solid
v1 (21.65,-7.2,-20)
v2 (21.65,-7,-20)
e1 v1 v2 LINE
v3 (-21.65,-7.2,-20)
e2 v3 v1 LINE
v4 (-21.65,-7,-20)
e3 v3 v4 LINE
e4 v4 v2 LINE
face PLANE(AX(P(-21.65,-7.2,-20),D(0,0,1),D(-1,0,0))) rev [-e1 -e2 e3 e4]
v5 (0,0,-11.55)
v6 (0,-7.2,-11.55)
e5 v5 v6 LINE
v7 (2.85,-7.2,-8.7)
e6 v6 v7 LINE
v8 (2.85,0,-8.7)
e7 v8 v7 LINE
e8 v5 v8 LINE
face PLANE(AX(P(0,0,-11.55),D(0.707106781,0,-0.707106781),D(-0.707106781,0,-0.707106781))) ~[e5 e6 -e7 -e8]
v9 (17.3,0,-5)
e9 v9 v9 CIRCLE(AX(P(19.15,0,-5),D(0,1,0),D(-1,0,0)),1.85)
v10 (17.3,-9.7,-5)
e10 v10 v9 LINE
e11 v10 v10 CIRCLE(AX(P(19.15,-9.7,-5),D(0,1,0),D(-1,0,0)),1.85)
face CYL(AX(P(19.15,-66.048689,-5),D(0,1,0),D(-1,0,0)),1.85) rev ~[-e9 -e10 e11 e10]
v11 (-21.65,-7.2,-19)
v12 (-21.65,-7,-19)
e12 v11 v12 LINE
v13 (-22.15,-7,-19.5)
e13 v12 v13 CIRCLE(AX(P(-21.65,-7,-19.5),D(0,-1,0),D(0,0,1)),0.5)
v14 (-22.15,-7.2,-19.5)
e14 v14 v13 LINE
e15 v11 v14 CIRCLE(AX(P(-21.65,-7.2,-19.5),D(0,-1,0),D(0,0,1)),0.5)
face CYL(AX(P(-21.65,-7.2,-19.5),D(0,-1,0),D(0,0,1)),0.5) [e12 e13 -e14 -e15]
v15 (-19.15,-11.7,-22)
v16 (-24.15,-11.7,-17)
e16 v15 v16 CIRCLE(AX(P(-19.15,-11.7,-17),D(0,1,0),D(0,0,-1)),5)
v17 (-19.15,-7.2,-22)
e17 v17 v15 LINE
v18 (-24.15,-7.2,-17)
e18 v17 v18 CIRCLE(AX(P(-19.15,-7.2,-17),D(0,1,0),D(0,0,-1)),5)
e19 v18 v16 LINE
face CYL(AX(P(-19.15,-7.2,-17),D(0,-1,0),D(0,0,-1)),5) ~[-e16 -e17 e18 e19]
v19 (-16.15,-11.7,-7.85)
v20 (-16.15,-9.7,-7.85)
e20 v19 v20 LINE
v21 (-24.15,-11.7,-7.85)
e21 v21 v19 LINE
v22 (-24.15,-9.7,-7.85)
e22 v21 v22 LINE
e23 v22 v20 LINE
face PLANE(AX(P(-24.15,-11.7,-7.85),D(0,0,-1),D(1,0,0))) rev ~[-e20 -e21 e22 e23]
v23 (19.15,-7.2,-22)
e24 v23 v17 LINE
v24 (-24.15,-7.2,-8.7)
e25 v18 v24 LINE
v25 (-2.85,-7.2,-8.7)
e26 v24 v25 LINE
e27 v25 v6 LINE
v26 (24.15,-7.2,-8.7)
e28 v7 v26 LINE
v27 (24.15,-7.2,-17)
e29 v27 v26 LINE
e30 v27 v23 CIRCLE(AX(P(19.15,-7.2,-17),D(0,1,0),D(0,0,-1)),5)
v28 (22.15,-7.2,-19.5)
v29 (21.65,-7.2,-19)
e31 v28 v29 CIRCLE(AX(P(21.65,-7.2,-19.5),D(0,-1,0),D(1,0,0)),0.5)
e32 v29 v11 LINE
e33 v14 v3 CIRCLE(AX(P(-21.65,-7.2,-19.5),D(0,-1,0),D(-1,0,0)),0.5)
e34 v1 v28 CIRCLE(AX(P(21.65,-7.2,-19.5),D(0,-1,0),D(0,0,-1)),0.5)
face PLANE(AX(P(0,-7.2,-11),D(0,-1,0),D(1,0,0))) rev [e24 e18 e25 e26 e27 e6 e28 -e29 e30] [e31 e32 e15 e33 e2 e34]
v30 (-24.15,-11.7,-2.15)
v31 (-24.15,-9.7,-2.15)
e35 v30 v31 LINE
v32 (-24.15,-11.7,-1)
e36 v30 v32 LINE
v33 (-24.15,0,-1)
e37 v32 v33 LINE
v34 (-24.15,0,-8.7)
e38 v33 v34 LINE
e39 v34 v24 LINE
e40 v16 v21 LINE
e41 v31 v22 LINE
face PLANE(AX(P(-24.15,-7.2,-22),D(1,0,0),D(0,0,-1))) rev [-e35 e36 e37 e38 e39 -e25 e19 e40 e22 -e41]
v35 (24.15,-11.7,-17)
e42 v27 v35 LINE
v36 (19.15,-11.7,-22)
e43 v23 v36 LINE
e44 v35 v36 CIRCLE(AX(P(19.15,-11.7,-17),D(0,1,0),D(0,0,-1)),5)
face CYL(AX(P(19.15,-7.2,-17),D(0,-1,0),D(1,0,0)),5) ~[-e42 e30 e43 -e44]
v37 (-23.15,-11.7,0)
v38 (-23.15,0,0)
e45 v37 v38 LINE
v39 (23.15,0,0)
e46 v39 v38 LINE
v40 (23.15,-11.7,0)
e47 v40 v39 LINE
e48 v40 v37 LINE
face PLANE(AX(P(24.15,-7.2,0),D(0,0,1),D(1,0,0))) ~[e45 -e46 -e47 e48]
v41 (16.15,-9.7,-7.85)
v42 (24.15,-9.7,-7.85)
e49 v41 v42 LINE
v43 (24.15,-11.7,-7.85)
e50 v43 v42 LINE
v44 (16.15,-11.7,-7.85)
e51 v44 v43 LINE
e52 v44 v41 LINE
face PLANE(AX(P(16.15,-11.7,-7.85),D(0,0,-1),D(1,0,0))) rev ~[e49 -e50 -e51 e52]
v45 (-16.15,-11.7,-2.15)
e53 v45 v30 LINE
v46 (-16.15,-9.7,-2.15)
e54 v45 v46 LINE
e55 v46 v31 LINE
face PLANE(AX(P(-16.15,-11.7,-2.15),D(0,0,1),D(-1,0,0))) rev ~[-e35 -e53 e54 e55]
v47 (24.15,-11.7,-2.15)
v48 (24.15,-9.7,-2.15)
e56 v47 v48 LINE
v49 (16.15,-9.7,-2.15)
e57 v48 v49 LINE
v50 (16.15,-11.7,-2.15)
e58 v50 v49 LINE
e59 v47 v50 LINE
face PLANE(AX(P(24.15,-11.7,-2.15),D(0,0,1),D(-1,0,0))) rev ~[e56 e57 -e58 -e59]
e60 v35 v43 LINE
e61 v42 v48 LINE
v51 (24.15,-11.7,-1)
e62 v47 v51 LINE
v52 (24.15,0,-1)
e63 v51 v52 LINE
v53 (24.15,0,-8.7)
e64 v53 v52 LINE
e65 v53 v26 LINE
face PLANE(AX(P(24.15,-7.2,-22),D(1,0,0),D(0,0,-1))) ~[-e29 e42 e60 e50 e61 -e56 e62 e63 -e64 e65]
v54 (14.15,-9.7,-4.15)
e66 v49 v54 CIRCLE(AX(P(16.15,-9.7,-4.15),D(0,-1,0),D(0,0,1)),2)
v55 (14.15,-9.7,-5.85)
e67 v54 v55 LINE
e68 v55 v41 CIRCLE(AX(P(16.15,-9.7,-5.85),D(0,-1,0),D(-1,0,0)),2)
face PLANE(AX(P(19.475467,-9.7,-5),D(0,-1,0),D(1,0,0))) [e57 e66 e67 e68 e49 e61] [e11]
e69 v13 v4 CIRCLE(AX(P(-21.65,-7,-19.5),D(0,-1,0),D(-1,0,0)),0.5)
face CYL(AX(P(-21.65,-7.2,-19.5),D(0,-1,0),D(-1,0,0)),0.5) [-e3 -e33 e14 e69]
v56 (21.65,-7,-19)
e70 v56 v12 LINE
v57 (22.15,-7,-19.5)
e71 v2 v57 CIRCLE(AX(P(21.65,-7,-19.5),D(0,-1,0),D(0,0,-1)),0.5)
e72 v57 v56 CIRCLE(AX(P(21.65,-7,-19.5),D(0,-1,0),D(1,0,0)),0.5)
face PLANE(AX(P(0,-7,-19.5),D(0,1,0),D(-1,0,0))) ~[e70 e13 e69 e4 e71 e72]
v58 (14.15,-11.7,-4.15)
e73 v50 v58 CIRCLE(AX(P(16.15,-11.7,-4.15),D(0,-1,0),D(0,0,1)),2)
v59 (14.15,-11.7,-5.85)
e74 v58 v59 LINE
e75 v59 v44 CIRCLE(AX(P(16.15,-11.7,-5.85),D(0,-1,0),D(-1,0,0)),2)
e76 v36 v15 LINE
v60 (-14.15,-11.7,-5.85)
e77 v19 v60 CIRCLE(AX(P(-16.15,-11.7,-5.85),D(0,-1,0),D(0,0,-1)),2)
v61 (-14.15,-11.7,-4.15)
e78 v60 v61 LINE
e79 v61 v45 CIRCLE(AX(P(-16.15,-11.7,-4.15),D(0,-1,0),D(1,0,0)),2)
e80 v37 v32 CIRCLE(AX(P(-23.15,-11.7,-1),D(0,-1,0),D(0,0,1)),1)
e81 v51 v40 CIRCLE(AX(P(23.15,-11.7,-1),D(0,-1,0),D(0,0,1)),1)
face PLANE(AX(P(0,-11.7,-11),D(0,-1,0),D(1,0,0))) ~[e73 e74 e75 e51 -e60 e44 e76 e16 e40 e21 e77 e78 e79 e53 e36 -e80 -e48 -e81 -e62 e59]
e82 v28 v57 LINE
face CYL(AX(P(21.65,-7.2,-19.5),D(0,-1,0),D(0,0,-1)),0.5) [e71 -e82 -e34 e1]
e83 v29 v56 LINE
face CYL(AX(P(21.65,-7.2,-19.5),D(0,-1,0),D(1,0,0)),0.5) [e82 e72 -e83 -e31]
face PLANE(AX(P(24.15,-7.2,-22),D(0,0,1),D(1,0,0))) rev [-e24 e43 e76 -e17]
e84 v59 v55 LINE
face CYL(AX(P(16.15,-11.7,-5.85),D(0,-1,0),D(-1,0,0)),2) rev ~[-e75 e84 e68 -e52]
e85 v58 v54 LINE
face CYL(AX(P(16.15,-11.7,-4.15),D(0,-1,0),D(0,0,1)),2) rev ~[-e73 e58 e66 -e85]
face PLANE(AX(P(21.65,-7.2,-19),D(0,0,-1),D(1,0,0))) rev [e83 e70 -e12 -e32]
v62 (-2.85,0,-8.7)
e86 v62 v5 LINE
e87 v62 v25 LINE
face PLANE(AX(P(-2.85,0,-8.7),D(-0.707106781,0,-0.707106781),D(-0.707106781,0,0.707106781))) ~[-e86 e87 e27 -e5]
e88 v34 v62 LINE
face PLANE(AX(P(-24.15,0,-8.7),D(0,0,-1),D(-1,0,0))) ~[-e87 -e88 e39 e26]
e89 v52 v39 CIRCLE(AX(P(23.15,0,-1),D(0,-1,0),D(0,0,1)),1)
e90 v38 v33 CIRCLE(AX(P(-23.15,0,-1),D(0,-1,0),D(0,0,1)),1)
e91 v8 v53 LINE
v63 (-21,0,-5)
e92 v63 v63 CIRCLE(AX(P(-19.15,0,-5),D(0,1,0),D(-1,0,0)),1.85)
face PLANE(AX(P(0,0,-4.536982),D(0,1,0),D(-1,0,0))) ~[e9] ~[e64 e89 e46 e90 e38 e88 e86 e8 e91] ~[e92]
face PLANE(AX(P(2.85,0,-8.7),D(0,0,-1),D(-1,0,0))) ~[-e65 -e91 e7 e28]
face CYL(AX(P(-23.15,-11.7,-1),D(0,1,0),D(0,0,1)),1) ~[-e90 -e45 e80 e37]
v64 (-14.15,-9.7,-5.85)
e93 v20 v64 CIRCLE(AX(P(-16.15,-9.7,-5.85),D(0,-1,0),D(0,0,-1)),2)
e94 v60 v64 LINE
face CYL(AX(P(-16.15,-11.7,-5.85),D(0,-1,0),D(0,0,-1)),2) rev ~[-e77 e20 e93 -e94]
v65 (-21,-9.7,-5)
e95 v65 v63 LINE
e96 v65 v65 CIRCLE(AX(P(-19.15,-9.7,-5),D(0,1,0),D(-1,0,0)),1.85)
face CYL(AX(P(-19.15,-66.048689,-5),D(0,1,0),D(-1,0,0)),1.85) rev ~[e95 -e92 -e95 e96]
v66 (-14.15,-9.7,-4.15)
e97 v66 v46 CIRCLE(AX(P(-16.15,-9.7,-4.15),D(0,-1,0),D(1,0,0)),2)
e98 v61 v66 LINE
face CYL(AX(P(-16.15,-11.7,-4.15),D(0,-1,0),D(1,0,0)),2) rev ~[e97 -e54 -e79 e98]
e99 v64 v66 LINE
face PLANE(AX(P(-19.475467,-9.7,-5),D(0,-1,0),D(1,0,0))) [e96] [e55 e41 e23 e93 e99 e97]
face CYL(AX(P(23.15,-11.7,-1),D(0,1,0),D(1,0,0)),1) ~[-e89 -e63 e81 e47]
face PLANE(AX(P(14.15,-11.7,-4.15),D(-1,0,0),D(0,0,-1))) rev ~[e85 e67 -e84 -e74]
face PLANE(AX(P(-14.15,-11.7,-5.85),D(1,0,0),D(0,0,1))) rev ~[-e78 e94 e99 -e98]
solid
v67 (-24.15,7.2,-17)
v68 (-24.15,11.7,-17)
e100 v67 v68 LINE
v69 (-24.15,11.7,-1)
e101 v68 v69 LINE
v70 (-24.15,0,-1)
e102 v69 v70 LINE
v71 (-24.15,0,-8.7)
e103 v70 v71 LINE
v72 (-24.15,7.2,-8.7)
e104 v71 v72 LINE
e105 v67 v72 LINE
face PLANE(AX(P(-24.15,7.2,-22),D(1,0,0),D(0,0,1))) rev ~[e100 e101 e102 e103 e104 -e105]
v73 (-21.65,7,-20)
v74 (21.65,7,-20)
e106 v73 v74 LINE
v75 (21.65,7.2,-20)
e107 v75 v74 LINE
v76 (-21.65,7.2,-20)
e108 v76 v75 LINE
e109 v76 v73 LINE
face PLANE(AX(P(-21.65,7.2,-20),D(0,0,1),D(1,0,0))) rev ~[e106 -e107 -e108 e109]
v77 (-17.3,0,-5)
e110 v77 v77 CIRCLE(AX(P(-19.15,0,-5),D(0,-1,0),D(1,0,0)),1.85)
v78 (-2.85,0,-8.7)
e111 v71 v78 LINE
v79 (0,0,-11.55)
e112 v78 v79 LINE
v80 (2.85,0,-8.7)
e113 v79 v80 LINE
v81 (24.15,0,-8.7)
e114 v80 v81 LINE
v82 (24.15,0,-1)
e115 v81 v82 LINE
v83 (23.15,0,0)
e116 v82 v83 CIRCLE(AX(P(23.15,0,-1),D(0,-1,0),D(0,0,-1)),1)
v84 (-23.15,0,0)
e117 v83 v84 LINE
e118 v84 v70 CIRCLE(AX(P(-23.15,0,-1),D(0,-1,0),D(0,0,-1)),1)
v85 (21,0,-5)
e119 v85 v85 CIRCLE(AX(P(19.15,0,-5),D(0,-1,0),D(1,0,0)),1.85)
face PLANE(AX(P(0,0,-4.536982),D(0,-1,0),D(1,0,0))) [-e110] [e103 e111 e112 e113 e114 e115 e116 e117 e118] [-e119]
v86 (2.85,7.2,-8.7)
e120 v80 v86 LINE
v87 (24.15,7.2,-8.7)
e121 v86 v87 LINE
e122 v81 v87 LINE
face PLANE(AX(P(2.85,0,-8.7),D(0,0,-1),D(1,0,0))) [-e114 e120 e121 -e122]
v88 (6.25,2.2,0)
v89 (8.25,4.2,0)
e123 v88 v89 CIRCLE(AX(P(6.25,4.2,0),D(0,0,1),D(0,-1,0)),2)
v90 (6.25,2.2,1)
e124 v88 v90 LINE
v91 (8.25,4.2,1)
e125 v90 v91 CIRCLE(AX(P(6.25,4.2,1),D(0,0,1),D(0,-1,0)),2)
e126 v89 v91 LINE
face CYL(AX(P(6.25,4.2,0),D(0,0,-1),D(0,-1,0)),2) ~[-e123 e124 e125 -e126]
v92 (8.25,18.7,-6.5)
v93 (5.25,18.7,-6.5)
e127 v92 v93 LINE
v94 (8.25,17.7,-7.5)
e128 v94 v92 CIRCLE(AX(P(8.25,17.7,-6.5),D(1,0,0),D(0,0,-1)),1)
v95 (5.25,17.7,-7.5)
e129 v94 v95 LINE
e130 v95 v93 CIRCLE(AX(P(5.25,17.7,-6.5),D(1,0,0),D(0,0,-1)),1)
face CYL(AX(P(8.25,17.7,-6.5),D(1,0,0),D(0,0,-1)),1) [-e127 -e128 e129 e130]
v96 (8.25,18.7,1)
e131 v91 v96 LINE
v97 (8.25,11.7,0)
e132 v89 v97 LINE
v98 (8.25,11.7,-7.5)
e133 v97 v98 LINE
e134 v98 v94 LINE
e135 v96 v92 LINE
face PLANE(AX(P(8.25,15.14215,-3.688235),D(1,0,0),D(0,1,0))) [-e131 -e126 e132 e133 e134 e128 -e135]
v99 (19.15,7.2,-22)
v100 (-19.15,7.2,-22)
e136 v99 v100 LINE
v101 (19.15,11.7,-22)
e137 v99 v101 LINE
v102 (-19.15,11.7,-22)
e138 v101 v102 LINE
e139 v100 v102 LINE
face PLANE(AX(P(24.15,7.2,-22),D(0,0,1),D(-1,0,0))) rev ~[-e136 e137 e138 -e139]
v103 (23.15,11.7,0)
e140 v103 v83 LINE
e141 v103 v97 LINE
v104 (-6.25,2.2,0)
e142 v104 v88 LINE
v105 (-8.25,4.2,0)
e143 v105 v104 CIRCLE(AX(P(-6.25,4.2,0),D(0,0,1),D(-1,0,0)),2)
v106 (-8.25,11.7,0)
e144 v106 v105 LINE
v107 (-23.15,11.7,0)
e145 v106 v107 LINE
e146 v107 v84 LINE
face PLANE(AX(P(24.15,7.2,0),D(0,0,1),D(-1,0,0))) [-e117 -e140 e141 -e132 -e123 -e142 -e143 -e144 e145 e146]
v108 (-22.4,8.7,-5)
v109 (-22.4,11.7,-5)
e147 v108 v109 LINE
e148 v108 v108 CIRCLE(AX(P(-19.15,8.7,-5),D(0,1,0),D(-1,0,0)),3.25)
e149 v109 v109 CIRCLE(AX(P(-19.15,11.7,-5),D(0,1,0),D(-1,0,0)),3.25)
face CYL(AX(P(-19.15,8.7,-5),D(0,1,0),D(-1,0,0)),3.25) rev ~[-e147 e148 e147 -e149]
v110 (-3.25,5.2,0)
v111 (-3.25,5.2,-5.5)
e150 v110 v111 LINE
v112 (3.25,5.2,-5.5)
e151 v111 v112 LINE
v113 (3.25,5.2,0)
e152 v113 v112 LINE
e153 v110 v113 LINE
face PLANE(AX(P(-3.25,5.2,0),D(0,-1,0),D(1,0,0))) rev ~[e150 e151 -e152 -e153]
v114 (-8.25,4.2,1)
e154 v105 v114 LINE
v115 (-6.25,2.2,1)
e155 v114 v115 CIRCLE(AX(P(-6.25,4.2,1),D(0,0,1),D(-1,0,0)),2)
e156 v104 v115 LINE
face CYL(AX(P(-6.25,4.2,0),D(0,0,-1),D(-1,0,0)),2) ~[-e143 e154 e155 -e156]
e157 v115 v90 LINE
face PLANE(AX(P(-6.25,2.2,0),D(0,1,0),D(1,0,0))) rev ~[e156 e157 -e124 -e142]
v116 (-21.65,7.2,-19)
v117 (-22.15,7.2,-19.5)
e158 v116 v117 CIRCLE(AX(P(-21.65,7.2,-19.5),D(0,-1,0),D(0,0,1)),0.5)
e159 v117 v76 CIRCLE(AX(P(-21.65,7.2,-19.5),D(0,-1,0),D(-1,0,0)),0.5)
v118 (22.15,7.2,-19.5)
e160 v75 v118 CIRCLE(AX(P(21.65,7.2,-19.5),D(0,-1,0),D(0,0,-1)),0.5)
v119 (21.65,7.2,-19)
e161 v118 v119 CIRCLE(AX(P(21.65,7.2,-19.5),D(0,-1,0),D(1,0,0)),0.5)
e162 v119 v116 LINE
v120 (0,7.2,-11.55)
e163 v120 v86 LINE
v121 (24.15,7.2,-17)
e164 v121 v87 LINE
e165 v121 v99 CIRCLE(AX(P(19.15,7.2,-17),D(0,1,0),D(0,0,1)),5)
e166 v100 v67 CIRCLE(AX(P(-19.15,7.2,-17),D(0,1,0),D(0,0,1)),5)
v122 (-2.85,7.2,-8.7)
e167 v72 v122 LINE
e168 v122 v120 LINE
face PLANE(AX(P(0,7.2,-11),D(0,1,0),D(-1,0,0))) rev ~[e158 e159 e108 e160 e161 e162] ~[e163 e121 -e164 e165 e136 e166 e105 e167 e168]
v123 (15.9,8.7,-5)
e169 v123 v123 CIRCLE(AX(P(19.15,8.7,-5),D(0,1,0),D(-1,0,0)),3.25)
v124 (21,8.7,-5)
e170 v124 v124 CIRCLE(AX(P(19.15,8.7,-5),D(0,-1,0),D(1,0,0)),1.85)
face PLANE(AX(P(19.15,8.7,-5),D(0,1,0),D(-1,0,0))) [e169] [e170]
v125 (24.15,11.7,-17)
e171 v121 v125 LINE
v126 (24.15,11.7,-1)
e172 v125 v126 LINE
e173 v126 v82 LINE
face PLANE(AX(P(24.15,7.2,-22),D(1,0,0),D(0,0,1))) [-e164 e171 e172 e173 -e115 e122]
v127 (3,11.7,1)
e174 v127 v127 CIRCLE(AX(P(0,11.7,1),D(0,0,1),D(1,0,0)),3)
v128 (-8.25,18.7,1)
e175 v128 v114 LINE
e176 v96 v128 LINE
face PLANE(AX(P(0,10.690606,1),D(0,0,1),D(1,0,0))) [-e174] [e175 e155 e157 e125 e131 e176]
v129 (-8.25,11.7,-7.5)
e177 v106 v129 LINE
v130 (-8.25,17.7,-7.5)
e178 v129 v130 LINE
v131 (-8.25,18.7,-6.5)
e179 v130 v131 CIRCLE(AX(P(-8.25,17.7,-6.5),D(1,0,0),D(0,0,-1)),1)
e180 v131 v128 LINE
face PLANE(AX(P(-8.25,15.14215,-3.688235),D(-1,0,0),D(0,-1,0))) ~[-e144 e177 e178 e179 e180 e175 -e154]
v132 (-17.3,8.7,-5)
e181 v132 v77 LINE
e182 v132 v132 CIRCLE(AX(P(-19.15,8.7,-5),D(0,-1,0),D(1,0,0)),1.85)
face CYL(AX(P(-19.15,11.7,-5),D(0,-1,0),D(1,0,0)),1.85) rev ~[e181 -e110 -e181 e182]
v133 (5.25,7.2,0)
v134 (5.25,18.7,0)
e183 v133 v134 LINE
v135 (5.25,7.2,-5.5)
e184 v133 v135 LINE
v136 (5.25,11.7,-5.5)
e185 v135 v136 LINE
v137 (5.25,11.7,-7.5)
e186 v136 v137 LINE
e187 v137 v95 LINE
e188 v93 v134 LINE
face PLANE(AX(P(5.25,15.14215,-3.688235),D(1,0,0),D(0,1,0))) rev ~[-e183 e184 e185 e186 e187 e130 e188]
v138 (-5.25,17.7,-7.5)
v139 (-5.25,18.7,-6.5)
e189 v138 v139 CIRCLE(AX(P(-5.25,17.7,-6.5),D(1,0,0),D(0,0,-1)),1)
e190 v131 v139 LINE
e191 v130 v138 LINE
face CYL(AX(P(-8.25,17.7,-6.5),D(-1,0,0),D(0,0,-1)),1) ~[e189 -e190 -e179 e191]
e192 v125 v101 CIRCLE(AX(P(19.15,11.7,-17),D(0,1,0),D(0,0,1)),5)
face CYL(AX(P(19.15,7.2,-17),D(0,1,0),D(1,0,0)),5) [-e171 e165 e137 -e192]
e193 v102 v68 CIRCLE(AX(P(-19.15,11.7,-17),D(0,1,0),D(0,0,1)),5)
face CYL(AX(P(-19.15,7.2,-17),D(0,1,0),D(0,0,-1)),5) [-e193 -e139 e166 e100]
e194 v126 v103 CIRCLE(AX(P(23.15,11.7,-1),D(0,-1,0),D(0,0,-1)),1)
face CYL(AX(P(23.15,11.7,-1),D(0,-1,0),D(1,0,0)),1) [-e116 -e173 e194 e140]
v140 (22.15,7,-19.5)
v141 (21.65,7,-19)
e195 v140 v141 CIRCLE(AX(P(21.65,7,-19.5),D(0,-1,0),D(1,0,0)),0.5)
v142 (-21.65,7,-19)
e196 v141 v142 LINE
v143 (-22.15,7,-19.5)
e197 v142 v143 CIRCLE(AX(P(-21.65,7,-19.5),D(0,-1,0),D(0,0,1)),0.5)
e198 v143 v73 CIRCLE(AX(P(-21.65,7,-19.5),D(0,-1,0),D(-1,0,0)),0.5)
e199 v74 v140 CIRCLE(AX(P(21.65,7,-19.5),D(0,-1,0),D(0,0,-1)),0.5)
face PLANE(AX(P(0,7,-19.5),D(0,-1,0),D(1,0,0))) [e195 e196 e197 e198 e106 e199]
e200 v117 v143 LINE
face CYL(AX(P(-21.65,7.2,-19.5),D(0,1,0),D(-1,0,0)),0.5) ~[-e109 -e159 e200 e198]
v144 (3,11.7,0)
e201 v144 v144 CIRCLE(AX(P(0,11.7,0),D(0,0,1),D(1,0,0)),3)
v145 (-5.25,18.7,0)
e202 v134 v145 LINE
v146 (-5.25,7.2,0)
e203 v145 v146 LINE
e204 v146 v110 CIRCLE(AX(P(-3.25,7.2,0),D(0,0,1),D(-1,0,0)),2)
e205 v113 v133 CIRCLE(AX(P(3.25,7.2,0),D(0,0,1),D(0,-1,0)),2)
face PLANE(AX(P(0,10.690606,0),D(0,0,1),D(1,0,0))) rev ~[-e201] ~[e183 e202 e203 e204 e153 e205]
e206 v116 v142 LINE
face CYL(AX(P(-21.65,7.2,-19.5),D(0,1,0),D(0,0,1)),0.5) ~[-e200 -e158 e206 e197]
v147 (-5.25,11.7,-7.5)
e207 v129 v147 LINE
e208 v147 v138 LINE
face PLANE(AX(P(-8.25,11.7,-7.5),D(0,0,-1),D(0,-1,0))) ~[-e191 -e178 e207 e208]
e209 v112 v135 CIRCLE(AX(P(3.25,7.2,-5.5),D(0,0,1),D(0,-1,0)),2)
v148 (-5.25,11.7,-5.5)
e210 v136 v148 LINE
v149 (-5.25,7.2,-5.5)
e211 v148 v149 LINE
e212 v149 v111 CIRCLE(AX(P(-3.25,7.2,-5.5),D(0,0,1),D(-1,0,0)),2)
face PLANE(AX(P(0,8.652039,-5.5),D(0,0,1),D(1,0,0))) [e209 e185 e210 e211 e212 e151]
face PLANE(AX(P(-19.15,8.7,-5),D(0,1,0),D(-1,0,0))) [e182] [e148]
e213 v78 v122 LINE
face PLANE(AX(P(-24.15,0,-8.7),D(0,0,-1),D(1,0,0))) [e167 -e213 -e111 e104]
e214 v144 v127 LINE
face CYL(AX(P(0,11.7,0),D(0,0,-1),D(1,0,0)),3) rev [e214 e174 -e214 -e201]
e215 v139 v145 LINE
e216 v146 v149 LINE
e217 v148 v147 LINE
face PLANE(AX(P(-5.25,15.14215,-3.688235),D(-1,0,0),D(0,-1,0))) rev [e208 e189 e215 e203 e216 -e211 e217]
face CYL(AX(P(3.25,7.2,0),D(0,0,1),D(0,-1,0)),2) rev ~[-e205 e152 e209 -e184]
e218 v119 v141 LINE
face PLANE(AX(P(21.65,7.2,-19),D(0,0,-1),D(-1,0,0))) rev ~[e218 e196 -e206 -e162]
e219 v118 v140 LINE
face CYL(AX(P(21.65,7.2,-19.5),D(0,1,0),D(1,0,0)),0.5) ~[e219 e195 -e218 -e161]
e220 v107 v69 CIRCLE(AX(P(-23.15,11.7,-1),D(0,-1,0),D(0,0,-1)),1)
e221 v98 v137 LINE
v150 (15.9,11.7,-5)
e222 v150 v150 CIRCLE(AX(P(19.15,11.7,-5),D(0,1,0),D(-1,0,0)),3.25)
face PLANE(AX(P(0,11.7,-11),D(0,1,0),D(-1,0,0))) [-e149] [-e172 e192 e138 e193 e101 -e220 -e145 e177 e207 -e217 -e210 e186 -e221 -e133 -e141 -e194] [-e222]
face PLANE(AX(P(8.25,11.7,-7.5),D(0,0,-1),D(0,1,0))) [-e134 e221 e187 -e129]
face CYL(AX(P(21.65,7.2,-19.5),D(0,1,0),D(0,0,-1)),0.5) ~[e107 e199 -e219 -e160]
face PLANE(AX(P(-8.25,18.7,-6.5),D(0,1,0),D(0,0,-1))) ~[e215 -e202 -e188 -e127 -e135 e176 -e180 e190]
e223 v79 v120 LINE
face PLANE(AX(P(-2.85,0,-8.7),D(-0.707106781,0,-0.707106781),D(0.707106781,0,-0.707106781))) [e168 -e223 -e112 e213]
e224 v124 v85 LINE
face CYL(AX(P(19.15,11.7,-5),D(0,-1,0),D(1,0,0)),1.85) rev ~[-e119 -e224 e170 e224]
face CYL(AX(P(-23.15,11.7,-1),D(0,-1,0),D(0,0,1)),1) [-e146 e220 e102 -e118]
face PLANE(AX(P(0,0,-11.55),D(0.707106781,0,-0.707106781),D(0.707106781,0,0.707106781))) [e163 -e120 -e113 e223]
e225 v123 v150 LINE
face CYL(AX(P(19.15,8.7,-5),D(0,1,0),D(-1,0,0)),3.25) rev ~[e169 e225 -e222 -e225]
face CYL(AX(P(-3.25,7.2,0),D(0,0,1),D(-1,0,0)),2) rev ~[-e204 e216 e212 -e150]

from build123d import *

# Parameters (mm, degrees)
F2_DEPTH        = 7.2
F3_W            = 48.3
F3_H            = 22
F4_DEPTH        = 4.5
F7_DEPTH        = 0.2
F10_D           = 3.7
F10_CBORE_D     = 6.5
F10_CBORE_DEPTH = 3
F11_D           = 3.7
F13_DEPTH       = 2
F14_R           = 1
F14_2_R         = 1
F15_R           = 5
F15_2_R         = 5
F17_DEPTH       = 5.5
F18_R           = 3
F19_DEPTH       = 1
F21_DEPTH       = 3


# Not quite as in the source:
# - a pattern or mirror of a feature is missing from the dataset's text; its kind, count and spacing are read off the source's solid


with BuildPart() as f2:
    # F1 (on Front) → F2 (new body)
    with BuildSketch(Plane.XZ):
        Polygon((-24.15, 0), (-24.15, -8.7), (-2.85, -8.7), (0, -11.55), (2.85, -8.7), (24.15, -8.7), (24.15, 0), align=None)
    extrude(amount=-F2_DEPTH)

    # F3 (on face) → F4 (join)
    with BuildSketch(Plane(origin=(0, 7.2, 0), x_dir=(-1, 0, 0), z_dir=(0, 1, 0))):
        with Locations((0, -11)):
            Rectangle(F3_W, F3_H)
    extrude(amount=F4_DEPTH)

    # F6 (on face) → F7 (join)
    with BuildSketch(Plane.XZ.offset(-7.2)):
        with BuildLine():
            ThreePointArc((22.15, -19.5), (22.0035533906, -19.1464466094), (21.65, -19))
            Line((21.65, -19), (-21.65, -19))
            ThreePointArc((-21.65, -19), (-22.0035533906, -19.1464466094), (-22.15, -19.5))
            ThreePointArc((-22.15, -19.5), (-22.0035533906, -19.8535533906), (-21.65, -20))
            Line((-21.65, -20), (21.65, -20))
            ThreePointArc((21.65, -20), (22.0035533906, -19.8535533906), (22.15, -19.5))
        make_face()
    extrude(amount=F7_DEPTH)


with BuildPart() as f8_1:
    # F8: instance of F2
    add(f2.part.mirror(Plane.XZ))

    # F11 (through all)
    with Locations(Plane.XZ.offset(11.7)):
        with Locations((-19.15, -5), (19.15, -5)):
            Hole(F11_D / 2)

    # F12 (on face) → F13 (cut)
    with BuildSketch(Plane.XZ.offset(11.7)):
        with BuildLine():
            Line((-16.15, -2.15), (-24.15, -2.15))
            Line((-24.15, -2.15), (-24.15, -7.85))
            Line((-24.15, -7.85), (-16.15, -7.85))
            ThreePointArc((-16.15, -7.85), (-14.7357864376, -7.2642135624), (-14.15, -5.85))
            Line((-14.15, -5.85), (-14.15, -4.15))
            ThreePointArc((-14.15, -4.15), (-14.7357864376, -2.7357864376), (-16.15, -2.15))
        make_face()
        with BuildLine():
            ThreePointArc((16.15, -2.15), (14.7357864376, -2.7357864376), (14.15, -4.15))
            Line((14.15, -4.15), (14.15, -5.85))
            ThreePointArc((14.15, -5.85), (14.7357864376, -7.2642135624), (16.15, -7.85))
            Line((16.15, -7.85), (24.15, -7.85))
            Line((24.15, -7.85), (24.15, -2.15))
            Line((24.15, -2.15), (16.15, -2.15))
        make_face()
    extrude(amount=-F13_DEPTH, mode=Mode.SUBTRACT)

    # F14#2
    f14_2_edges = [f8_1.edges().sort_by_distance(p)[0] for p in [
        (-24.15, -5.85, 0),
        (24.15, -5.85, 0),
    ]]
    fillet(f14_2_edges, radius=F14_2_R)

    # F15#2
    f15_2_edges = [f8_1.edges().sort_by_distance(p)[0] for p in [
        (24.15, -9.45, -22),
        (-24.15, -9.45, -22),
    ]]
    fillet(f15_2_edges, radius=F15_2_R)


with BuildPart() as f2_1:
    add(f2.part)

    # F10 (through all)
    with Locations(Plane(origin=(0, 11.7, 0), x_dir=(-1, 0, 0), z_dir=(0, 1, 0))):
        with Locations((-19.15, -5), (19.15, -5)):
            CounterBoreHole(F10_D / 2, F10_CBORE_D / 2, F10_CBORE_DEPTH)

    # F14
    f14_edges = [f2_1.edges().sort_by_distance(p)[0] for p in [
        (-24.15, 5.85, 0),
        (24.15, 5.85, 0),
    ]]
    fillet(f14_edges, radius=F14_R)

    # F15
    f15_edges = [f2_1.edges().sort_by_distance(p)[0] for p in [
        (24.15, 9.45, -22),
        (-24.15, 9.45, -22),
    ]]
    fillet(f15_edges, radius=F15_R)

    # F16 (on face) → F17 (cut)
    with BuildSketch(Plane.XY):
        with BuildLine():
            ThreePointArc((-5.25, 7.2), (-4.6642135624, 5.7857864376), (-3.25, 5.2))
            Line((-3.25, 5.2), (3.25, 5.2))
            ThreePointArc((3.25, 5.2), (4.6642135624, 5.7857864376), (5.25, 7.2))
            Line((5.25, 7.2), (5.25, 11.7))
            Line((5.25, 11.7), (-5.25, 11.7))
            Line((-5.25, 11.7), (-5.25, 7.2))
        make_face()
    extrude(amount=-F17_DEPTH, mode=Mode.SUBTRACT)

    # F18 (on face) → F19 (join)
    with BuildSketch(Plane.XY):
        with BuildLine():
            Line((8.25, 18.7), (-8.25, 18.7))
            Line((-8.25, 18.7), (-8.25, 4.2))
            ThreePointArc((-8.25, 4.2), (-7.6642135624, 2.7857864376), (-6.25, 2.2))
            Line((-6.25, 2.2), (6.25, 2.2))
            ThreePointArc((6.25, 2.2), (7.6642135624, 2.7857864376), (8.25, 4.2))
            Line((8.25, 4.2), (8.25, 18.7))
        make_face()
        with Locations((0, 11.7)):
            Circle(F18_R, mode=Mode.SUBTRACT)
    extrude(amount=F19_DEPTH)

    # F20 (on face) → F21 (join)
    with BuildSketch(Plane.YZ.offset(8.25)):
        with BuildLine():
            Line((18.7, -6.5), (18.7, 0))
            Line((18.7, 0), (11.7, 0))
            Line((11.7, 0), (11.7, -7.5))
            Line((11.7, -7.5), (17.7, -7.5))
            ThreePointArc((17.7, -7.5), (18.4071067812, -7.2071067812), (18.7, -6.5))
        make_face()
    f21 = extrude(amount=-F21_DEPTH)

    # F21_copies: F21 across plane
    add(f21.mirror(Plane(origin=(0, 0, 0), x_dir=(0, 0, -1), z_dir=(-1, 0, 0))))


solid = Compound([f8_1.part, f2_1.part])
